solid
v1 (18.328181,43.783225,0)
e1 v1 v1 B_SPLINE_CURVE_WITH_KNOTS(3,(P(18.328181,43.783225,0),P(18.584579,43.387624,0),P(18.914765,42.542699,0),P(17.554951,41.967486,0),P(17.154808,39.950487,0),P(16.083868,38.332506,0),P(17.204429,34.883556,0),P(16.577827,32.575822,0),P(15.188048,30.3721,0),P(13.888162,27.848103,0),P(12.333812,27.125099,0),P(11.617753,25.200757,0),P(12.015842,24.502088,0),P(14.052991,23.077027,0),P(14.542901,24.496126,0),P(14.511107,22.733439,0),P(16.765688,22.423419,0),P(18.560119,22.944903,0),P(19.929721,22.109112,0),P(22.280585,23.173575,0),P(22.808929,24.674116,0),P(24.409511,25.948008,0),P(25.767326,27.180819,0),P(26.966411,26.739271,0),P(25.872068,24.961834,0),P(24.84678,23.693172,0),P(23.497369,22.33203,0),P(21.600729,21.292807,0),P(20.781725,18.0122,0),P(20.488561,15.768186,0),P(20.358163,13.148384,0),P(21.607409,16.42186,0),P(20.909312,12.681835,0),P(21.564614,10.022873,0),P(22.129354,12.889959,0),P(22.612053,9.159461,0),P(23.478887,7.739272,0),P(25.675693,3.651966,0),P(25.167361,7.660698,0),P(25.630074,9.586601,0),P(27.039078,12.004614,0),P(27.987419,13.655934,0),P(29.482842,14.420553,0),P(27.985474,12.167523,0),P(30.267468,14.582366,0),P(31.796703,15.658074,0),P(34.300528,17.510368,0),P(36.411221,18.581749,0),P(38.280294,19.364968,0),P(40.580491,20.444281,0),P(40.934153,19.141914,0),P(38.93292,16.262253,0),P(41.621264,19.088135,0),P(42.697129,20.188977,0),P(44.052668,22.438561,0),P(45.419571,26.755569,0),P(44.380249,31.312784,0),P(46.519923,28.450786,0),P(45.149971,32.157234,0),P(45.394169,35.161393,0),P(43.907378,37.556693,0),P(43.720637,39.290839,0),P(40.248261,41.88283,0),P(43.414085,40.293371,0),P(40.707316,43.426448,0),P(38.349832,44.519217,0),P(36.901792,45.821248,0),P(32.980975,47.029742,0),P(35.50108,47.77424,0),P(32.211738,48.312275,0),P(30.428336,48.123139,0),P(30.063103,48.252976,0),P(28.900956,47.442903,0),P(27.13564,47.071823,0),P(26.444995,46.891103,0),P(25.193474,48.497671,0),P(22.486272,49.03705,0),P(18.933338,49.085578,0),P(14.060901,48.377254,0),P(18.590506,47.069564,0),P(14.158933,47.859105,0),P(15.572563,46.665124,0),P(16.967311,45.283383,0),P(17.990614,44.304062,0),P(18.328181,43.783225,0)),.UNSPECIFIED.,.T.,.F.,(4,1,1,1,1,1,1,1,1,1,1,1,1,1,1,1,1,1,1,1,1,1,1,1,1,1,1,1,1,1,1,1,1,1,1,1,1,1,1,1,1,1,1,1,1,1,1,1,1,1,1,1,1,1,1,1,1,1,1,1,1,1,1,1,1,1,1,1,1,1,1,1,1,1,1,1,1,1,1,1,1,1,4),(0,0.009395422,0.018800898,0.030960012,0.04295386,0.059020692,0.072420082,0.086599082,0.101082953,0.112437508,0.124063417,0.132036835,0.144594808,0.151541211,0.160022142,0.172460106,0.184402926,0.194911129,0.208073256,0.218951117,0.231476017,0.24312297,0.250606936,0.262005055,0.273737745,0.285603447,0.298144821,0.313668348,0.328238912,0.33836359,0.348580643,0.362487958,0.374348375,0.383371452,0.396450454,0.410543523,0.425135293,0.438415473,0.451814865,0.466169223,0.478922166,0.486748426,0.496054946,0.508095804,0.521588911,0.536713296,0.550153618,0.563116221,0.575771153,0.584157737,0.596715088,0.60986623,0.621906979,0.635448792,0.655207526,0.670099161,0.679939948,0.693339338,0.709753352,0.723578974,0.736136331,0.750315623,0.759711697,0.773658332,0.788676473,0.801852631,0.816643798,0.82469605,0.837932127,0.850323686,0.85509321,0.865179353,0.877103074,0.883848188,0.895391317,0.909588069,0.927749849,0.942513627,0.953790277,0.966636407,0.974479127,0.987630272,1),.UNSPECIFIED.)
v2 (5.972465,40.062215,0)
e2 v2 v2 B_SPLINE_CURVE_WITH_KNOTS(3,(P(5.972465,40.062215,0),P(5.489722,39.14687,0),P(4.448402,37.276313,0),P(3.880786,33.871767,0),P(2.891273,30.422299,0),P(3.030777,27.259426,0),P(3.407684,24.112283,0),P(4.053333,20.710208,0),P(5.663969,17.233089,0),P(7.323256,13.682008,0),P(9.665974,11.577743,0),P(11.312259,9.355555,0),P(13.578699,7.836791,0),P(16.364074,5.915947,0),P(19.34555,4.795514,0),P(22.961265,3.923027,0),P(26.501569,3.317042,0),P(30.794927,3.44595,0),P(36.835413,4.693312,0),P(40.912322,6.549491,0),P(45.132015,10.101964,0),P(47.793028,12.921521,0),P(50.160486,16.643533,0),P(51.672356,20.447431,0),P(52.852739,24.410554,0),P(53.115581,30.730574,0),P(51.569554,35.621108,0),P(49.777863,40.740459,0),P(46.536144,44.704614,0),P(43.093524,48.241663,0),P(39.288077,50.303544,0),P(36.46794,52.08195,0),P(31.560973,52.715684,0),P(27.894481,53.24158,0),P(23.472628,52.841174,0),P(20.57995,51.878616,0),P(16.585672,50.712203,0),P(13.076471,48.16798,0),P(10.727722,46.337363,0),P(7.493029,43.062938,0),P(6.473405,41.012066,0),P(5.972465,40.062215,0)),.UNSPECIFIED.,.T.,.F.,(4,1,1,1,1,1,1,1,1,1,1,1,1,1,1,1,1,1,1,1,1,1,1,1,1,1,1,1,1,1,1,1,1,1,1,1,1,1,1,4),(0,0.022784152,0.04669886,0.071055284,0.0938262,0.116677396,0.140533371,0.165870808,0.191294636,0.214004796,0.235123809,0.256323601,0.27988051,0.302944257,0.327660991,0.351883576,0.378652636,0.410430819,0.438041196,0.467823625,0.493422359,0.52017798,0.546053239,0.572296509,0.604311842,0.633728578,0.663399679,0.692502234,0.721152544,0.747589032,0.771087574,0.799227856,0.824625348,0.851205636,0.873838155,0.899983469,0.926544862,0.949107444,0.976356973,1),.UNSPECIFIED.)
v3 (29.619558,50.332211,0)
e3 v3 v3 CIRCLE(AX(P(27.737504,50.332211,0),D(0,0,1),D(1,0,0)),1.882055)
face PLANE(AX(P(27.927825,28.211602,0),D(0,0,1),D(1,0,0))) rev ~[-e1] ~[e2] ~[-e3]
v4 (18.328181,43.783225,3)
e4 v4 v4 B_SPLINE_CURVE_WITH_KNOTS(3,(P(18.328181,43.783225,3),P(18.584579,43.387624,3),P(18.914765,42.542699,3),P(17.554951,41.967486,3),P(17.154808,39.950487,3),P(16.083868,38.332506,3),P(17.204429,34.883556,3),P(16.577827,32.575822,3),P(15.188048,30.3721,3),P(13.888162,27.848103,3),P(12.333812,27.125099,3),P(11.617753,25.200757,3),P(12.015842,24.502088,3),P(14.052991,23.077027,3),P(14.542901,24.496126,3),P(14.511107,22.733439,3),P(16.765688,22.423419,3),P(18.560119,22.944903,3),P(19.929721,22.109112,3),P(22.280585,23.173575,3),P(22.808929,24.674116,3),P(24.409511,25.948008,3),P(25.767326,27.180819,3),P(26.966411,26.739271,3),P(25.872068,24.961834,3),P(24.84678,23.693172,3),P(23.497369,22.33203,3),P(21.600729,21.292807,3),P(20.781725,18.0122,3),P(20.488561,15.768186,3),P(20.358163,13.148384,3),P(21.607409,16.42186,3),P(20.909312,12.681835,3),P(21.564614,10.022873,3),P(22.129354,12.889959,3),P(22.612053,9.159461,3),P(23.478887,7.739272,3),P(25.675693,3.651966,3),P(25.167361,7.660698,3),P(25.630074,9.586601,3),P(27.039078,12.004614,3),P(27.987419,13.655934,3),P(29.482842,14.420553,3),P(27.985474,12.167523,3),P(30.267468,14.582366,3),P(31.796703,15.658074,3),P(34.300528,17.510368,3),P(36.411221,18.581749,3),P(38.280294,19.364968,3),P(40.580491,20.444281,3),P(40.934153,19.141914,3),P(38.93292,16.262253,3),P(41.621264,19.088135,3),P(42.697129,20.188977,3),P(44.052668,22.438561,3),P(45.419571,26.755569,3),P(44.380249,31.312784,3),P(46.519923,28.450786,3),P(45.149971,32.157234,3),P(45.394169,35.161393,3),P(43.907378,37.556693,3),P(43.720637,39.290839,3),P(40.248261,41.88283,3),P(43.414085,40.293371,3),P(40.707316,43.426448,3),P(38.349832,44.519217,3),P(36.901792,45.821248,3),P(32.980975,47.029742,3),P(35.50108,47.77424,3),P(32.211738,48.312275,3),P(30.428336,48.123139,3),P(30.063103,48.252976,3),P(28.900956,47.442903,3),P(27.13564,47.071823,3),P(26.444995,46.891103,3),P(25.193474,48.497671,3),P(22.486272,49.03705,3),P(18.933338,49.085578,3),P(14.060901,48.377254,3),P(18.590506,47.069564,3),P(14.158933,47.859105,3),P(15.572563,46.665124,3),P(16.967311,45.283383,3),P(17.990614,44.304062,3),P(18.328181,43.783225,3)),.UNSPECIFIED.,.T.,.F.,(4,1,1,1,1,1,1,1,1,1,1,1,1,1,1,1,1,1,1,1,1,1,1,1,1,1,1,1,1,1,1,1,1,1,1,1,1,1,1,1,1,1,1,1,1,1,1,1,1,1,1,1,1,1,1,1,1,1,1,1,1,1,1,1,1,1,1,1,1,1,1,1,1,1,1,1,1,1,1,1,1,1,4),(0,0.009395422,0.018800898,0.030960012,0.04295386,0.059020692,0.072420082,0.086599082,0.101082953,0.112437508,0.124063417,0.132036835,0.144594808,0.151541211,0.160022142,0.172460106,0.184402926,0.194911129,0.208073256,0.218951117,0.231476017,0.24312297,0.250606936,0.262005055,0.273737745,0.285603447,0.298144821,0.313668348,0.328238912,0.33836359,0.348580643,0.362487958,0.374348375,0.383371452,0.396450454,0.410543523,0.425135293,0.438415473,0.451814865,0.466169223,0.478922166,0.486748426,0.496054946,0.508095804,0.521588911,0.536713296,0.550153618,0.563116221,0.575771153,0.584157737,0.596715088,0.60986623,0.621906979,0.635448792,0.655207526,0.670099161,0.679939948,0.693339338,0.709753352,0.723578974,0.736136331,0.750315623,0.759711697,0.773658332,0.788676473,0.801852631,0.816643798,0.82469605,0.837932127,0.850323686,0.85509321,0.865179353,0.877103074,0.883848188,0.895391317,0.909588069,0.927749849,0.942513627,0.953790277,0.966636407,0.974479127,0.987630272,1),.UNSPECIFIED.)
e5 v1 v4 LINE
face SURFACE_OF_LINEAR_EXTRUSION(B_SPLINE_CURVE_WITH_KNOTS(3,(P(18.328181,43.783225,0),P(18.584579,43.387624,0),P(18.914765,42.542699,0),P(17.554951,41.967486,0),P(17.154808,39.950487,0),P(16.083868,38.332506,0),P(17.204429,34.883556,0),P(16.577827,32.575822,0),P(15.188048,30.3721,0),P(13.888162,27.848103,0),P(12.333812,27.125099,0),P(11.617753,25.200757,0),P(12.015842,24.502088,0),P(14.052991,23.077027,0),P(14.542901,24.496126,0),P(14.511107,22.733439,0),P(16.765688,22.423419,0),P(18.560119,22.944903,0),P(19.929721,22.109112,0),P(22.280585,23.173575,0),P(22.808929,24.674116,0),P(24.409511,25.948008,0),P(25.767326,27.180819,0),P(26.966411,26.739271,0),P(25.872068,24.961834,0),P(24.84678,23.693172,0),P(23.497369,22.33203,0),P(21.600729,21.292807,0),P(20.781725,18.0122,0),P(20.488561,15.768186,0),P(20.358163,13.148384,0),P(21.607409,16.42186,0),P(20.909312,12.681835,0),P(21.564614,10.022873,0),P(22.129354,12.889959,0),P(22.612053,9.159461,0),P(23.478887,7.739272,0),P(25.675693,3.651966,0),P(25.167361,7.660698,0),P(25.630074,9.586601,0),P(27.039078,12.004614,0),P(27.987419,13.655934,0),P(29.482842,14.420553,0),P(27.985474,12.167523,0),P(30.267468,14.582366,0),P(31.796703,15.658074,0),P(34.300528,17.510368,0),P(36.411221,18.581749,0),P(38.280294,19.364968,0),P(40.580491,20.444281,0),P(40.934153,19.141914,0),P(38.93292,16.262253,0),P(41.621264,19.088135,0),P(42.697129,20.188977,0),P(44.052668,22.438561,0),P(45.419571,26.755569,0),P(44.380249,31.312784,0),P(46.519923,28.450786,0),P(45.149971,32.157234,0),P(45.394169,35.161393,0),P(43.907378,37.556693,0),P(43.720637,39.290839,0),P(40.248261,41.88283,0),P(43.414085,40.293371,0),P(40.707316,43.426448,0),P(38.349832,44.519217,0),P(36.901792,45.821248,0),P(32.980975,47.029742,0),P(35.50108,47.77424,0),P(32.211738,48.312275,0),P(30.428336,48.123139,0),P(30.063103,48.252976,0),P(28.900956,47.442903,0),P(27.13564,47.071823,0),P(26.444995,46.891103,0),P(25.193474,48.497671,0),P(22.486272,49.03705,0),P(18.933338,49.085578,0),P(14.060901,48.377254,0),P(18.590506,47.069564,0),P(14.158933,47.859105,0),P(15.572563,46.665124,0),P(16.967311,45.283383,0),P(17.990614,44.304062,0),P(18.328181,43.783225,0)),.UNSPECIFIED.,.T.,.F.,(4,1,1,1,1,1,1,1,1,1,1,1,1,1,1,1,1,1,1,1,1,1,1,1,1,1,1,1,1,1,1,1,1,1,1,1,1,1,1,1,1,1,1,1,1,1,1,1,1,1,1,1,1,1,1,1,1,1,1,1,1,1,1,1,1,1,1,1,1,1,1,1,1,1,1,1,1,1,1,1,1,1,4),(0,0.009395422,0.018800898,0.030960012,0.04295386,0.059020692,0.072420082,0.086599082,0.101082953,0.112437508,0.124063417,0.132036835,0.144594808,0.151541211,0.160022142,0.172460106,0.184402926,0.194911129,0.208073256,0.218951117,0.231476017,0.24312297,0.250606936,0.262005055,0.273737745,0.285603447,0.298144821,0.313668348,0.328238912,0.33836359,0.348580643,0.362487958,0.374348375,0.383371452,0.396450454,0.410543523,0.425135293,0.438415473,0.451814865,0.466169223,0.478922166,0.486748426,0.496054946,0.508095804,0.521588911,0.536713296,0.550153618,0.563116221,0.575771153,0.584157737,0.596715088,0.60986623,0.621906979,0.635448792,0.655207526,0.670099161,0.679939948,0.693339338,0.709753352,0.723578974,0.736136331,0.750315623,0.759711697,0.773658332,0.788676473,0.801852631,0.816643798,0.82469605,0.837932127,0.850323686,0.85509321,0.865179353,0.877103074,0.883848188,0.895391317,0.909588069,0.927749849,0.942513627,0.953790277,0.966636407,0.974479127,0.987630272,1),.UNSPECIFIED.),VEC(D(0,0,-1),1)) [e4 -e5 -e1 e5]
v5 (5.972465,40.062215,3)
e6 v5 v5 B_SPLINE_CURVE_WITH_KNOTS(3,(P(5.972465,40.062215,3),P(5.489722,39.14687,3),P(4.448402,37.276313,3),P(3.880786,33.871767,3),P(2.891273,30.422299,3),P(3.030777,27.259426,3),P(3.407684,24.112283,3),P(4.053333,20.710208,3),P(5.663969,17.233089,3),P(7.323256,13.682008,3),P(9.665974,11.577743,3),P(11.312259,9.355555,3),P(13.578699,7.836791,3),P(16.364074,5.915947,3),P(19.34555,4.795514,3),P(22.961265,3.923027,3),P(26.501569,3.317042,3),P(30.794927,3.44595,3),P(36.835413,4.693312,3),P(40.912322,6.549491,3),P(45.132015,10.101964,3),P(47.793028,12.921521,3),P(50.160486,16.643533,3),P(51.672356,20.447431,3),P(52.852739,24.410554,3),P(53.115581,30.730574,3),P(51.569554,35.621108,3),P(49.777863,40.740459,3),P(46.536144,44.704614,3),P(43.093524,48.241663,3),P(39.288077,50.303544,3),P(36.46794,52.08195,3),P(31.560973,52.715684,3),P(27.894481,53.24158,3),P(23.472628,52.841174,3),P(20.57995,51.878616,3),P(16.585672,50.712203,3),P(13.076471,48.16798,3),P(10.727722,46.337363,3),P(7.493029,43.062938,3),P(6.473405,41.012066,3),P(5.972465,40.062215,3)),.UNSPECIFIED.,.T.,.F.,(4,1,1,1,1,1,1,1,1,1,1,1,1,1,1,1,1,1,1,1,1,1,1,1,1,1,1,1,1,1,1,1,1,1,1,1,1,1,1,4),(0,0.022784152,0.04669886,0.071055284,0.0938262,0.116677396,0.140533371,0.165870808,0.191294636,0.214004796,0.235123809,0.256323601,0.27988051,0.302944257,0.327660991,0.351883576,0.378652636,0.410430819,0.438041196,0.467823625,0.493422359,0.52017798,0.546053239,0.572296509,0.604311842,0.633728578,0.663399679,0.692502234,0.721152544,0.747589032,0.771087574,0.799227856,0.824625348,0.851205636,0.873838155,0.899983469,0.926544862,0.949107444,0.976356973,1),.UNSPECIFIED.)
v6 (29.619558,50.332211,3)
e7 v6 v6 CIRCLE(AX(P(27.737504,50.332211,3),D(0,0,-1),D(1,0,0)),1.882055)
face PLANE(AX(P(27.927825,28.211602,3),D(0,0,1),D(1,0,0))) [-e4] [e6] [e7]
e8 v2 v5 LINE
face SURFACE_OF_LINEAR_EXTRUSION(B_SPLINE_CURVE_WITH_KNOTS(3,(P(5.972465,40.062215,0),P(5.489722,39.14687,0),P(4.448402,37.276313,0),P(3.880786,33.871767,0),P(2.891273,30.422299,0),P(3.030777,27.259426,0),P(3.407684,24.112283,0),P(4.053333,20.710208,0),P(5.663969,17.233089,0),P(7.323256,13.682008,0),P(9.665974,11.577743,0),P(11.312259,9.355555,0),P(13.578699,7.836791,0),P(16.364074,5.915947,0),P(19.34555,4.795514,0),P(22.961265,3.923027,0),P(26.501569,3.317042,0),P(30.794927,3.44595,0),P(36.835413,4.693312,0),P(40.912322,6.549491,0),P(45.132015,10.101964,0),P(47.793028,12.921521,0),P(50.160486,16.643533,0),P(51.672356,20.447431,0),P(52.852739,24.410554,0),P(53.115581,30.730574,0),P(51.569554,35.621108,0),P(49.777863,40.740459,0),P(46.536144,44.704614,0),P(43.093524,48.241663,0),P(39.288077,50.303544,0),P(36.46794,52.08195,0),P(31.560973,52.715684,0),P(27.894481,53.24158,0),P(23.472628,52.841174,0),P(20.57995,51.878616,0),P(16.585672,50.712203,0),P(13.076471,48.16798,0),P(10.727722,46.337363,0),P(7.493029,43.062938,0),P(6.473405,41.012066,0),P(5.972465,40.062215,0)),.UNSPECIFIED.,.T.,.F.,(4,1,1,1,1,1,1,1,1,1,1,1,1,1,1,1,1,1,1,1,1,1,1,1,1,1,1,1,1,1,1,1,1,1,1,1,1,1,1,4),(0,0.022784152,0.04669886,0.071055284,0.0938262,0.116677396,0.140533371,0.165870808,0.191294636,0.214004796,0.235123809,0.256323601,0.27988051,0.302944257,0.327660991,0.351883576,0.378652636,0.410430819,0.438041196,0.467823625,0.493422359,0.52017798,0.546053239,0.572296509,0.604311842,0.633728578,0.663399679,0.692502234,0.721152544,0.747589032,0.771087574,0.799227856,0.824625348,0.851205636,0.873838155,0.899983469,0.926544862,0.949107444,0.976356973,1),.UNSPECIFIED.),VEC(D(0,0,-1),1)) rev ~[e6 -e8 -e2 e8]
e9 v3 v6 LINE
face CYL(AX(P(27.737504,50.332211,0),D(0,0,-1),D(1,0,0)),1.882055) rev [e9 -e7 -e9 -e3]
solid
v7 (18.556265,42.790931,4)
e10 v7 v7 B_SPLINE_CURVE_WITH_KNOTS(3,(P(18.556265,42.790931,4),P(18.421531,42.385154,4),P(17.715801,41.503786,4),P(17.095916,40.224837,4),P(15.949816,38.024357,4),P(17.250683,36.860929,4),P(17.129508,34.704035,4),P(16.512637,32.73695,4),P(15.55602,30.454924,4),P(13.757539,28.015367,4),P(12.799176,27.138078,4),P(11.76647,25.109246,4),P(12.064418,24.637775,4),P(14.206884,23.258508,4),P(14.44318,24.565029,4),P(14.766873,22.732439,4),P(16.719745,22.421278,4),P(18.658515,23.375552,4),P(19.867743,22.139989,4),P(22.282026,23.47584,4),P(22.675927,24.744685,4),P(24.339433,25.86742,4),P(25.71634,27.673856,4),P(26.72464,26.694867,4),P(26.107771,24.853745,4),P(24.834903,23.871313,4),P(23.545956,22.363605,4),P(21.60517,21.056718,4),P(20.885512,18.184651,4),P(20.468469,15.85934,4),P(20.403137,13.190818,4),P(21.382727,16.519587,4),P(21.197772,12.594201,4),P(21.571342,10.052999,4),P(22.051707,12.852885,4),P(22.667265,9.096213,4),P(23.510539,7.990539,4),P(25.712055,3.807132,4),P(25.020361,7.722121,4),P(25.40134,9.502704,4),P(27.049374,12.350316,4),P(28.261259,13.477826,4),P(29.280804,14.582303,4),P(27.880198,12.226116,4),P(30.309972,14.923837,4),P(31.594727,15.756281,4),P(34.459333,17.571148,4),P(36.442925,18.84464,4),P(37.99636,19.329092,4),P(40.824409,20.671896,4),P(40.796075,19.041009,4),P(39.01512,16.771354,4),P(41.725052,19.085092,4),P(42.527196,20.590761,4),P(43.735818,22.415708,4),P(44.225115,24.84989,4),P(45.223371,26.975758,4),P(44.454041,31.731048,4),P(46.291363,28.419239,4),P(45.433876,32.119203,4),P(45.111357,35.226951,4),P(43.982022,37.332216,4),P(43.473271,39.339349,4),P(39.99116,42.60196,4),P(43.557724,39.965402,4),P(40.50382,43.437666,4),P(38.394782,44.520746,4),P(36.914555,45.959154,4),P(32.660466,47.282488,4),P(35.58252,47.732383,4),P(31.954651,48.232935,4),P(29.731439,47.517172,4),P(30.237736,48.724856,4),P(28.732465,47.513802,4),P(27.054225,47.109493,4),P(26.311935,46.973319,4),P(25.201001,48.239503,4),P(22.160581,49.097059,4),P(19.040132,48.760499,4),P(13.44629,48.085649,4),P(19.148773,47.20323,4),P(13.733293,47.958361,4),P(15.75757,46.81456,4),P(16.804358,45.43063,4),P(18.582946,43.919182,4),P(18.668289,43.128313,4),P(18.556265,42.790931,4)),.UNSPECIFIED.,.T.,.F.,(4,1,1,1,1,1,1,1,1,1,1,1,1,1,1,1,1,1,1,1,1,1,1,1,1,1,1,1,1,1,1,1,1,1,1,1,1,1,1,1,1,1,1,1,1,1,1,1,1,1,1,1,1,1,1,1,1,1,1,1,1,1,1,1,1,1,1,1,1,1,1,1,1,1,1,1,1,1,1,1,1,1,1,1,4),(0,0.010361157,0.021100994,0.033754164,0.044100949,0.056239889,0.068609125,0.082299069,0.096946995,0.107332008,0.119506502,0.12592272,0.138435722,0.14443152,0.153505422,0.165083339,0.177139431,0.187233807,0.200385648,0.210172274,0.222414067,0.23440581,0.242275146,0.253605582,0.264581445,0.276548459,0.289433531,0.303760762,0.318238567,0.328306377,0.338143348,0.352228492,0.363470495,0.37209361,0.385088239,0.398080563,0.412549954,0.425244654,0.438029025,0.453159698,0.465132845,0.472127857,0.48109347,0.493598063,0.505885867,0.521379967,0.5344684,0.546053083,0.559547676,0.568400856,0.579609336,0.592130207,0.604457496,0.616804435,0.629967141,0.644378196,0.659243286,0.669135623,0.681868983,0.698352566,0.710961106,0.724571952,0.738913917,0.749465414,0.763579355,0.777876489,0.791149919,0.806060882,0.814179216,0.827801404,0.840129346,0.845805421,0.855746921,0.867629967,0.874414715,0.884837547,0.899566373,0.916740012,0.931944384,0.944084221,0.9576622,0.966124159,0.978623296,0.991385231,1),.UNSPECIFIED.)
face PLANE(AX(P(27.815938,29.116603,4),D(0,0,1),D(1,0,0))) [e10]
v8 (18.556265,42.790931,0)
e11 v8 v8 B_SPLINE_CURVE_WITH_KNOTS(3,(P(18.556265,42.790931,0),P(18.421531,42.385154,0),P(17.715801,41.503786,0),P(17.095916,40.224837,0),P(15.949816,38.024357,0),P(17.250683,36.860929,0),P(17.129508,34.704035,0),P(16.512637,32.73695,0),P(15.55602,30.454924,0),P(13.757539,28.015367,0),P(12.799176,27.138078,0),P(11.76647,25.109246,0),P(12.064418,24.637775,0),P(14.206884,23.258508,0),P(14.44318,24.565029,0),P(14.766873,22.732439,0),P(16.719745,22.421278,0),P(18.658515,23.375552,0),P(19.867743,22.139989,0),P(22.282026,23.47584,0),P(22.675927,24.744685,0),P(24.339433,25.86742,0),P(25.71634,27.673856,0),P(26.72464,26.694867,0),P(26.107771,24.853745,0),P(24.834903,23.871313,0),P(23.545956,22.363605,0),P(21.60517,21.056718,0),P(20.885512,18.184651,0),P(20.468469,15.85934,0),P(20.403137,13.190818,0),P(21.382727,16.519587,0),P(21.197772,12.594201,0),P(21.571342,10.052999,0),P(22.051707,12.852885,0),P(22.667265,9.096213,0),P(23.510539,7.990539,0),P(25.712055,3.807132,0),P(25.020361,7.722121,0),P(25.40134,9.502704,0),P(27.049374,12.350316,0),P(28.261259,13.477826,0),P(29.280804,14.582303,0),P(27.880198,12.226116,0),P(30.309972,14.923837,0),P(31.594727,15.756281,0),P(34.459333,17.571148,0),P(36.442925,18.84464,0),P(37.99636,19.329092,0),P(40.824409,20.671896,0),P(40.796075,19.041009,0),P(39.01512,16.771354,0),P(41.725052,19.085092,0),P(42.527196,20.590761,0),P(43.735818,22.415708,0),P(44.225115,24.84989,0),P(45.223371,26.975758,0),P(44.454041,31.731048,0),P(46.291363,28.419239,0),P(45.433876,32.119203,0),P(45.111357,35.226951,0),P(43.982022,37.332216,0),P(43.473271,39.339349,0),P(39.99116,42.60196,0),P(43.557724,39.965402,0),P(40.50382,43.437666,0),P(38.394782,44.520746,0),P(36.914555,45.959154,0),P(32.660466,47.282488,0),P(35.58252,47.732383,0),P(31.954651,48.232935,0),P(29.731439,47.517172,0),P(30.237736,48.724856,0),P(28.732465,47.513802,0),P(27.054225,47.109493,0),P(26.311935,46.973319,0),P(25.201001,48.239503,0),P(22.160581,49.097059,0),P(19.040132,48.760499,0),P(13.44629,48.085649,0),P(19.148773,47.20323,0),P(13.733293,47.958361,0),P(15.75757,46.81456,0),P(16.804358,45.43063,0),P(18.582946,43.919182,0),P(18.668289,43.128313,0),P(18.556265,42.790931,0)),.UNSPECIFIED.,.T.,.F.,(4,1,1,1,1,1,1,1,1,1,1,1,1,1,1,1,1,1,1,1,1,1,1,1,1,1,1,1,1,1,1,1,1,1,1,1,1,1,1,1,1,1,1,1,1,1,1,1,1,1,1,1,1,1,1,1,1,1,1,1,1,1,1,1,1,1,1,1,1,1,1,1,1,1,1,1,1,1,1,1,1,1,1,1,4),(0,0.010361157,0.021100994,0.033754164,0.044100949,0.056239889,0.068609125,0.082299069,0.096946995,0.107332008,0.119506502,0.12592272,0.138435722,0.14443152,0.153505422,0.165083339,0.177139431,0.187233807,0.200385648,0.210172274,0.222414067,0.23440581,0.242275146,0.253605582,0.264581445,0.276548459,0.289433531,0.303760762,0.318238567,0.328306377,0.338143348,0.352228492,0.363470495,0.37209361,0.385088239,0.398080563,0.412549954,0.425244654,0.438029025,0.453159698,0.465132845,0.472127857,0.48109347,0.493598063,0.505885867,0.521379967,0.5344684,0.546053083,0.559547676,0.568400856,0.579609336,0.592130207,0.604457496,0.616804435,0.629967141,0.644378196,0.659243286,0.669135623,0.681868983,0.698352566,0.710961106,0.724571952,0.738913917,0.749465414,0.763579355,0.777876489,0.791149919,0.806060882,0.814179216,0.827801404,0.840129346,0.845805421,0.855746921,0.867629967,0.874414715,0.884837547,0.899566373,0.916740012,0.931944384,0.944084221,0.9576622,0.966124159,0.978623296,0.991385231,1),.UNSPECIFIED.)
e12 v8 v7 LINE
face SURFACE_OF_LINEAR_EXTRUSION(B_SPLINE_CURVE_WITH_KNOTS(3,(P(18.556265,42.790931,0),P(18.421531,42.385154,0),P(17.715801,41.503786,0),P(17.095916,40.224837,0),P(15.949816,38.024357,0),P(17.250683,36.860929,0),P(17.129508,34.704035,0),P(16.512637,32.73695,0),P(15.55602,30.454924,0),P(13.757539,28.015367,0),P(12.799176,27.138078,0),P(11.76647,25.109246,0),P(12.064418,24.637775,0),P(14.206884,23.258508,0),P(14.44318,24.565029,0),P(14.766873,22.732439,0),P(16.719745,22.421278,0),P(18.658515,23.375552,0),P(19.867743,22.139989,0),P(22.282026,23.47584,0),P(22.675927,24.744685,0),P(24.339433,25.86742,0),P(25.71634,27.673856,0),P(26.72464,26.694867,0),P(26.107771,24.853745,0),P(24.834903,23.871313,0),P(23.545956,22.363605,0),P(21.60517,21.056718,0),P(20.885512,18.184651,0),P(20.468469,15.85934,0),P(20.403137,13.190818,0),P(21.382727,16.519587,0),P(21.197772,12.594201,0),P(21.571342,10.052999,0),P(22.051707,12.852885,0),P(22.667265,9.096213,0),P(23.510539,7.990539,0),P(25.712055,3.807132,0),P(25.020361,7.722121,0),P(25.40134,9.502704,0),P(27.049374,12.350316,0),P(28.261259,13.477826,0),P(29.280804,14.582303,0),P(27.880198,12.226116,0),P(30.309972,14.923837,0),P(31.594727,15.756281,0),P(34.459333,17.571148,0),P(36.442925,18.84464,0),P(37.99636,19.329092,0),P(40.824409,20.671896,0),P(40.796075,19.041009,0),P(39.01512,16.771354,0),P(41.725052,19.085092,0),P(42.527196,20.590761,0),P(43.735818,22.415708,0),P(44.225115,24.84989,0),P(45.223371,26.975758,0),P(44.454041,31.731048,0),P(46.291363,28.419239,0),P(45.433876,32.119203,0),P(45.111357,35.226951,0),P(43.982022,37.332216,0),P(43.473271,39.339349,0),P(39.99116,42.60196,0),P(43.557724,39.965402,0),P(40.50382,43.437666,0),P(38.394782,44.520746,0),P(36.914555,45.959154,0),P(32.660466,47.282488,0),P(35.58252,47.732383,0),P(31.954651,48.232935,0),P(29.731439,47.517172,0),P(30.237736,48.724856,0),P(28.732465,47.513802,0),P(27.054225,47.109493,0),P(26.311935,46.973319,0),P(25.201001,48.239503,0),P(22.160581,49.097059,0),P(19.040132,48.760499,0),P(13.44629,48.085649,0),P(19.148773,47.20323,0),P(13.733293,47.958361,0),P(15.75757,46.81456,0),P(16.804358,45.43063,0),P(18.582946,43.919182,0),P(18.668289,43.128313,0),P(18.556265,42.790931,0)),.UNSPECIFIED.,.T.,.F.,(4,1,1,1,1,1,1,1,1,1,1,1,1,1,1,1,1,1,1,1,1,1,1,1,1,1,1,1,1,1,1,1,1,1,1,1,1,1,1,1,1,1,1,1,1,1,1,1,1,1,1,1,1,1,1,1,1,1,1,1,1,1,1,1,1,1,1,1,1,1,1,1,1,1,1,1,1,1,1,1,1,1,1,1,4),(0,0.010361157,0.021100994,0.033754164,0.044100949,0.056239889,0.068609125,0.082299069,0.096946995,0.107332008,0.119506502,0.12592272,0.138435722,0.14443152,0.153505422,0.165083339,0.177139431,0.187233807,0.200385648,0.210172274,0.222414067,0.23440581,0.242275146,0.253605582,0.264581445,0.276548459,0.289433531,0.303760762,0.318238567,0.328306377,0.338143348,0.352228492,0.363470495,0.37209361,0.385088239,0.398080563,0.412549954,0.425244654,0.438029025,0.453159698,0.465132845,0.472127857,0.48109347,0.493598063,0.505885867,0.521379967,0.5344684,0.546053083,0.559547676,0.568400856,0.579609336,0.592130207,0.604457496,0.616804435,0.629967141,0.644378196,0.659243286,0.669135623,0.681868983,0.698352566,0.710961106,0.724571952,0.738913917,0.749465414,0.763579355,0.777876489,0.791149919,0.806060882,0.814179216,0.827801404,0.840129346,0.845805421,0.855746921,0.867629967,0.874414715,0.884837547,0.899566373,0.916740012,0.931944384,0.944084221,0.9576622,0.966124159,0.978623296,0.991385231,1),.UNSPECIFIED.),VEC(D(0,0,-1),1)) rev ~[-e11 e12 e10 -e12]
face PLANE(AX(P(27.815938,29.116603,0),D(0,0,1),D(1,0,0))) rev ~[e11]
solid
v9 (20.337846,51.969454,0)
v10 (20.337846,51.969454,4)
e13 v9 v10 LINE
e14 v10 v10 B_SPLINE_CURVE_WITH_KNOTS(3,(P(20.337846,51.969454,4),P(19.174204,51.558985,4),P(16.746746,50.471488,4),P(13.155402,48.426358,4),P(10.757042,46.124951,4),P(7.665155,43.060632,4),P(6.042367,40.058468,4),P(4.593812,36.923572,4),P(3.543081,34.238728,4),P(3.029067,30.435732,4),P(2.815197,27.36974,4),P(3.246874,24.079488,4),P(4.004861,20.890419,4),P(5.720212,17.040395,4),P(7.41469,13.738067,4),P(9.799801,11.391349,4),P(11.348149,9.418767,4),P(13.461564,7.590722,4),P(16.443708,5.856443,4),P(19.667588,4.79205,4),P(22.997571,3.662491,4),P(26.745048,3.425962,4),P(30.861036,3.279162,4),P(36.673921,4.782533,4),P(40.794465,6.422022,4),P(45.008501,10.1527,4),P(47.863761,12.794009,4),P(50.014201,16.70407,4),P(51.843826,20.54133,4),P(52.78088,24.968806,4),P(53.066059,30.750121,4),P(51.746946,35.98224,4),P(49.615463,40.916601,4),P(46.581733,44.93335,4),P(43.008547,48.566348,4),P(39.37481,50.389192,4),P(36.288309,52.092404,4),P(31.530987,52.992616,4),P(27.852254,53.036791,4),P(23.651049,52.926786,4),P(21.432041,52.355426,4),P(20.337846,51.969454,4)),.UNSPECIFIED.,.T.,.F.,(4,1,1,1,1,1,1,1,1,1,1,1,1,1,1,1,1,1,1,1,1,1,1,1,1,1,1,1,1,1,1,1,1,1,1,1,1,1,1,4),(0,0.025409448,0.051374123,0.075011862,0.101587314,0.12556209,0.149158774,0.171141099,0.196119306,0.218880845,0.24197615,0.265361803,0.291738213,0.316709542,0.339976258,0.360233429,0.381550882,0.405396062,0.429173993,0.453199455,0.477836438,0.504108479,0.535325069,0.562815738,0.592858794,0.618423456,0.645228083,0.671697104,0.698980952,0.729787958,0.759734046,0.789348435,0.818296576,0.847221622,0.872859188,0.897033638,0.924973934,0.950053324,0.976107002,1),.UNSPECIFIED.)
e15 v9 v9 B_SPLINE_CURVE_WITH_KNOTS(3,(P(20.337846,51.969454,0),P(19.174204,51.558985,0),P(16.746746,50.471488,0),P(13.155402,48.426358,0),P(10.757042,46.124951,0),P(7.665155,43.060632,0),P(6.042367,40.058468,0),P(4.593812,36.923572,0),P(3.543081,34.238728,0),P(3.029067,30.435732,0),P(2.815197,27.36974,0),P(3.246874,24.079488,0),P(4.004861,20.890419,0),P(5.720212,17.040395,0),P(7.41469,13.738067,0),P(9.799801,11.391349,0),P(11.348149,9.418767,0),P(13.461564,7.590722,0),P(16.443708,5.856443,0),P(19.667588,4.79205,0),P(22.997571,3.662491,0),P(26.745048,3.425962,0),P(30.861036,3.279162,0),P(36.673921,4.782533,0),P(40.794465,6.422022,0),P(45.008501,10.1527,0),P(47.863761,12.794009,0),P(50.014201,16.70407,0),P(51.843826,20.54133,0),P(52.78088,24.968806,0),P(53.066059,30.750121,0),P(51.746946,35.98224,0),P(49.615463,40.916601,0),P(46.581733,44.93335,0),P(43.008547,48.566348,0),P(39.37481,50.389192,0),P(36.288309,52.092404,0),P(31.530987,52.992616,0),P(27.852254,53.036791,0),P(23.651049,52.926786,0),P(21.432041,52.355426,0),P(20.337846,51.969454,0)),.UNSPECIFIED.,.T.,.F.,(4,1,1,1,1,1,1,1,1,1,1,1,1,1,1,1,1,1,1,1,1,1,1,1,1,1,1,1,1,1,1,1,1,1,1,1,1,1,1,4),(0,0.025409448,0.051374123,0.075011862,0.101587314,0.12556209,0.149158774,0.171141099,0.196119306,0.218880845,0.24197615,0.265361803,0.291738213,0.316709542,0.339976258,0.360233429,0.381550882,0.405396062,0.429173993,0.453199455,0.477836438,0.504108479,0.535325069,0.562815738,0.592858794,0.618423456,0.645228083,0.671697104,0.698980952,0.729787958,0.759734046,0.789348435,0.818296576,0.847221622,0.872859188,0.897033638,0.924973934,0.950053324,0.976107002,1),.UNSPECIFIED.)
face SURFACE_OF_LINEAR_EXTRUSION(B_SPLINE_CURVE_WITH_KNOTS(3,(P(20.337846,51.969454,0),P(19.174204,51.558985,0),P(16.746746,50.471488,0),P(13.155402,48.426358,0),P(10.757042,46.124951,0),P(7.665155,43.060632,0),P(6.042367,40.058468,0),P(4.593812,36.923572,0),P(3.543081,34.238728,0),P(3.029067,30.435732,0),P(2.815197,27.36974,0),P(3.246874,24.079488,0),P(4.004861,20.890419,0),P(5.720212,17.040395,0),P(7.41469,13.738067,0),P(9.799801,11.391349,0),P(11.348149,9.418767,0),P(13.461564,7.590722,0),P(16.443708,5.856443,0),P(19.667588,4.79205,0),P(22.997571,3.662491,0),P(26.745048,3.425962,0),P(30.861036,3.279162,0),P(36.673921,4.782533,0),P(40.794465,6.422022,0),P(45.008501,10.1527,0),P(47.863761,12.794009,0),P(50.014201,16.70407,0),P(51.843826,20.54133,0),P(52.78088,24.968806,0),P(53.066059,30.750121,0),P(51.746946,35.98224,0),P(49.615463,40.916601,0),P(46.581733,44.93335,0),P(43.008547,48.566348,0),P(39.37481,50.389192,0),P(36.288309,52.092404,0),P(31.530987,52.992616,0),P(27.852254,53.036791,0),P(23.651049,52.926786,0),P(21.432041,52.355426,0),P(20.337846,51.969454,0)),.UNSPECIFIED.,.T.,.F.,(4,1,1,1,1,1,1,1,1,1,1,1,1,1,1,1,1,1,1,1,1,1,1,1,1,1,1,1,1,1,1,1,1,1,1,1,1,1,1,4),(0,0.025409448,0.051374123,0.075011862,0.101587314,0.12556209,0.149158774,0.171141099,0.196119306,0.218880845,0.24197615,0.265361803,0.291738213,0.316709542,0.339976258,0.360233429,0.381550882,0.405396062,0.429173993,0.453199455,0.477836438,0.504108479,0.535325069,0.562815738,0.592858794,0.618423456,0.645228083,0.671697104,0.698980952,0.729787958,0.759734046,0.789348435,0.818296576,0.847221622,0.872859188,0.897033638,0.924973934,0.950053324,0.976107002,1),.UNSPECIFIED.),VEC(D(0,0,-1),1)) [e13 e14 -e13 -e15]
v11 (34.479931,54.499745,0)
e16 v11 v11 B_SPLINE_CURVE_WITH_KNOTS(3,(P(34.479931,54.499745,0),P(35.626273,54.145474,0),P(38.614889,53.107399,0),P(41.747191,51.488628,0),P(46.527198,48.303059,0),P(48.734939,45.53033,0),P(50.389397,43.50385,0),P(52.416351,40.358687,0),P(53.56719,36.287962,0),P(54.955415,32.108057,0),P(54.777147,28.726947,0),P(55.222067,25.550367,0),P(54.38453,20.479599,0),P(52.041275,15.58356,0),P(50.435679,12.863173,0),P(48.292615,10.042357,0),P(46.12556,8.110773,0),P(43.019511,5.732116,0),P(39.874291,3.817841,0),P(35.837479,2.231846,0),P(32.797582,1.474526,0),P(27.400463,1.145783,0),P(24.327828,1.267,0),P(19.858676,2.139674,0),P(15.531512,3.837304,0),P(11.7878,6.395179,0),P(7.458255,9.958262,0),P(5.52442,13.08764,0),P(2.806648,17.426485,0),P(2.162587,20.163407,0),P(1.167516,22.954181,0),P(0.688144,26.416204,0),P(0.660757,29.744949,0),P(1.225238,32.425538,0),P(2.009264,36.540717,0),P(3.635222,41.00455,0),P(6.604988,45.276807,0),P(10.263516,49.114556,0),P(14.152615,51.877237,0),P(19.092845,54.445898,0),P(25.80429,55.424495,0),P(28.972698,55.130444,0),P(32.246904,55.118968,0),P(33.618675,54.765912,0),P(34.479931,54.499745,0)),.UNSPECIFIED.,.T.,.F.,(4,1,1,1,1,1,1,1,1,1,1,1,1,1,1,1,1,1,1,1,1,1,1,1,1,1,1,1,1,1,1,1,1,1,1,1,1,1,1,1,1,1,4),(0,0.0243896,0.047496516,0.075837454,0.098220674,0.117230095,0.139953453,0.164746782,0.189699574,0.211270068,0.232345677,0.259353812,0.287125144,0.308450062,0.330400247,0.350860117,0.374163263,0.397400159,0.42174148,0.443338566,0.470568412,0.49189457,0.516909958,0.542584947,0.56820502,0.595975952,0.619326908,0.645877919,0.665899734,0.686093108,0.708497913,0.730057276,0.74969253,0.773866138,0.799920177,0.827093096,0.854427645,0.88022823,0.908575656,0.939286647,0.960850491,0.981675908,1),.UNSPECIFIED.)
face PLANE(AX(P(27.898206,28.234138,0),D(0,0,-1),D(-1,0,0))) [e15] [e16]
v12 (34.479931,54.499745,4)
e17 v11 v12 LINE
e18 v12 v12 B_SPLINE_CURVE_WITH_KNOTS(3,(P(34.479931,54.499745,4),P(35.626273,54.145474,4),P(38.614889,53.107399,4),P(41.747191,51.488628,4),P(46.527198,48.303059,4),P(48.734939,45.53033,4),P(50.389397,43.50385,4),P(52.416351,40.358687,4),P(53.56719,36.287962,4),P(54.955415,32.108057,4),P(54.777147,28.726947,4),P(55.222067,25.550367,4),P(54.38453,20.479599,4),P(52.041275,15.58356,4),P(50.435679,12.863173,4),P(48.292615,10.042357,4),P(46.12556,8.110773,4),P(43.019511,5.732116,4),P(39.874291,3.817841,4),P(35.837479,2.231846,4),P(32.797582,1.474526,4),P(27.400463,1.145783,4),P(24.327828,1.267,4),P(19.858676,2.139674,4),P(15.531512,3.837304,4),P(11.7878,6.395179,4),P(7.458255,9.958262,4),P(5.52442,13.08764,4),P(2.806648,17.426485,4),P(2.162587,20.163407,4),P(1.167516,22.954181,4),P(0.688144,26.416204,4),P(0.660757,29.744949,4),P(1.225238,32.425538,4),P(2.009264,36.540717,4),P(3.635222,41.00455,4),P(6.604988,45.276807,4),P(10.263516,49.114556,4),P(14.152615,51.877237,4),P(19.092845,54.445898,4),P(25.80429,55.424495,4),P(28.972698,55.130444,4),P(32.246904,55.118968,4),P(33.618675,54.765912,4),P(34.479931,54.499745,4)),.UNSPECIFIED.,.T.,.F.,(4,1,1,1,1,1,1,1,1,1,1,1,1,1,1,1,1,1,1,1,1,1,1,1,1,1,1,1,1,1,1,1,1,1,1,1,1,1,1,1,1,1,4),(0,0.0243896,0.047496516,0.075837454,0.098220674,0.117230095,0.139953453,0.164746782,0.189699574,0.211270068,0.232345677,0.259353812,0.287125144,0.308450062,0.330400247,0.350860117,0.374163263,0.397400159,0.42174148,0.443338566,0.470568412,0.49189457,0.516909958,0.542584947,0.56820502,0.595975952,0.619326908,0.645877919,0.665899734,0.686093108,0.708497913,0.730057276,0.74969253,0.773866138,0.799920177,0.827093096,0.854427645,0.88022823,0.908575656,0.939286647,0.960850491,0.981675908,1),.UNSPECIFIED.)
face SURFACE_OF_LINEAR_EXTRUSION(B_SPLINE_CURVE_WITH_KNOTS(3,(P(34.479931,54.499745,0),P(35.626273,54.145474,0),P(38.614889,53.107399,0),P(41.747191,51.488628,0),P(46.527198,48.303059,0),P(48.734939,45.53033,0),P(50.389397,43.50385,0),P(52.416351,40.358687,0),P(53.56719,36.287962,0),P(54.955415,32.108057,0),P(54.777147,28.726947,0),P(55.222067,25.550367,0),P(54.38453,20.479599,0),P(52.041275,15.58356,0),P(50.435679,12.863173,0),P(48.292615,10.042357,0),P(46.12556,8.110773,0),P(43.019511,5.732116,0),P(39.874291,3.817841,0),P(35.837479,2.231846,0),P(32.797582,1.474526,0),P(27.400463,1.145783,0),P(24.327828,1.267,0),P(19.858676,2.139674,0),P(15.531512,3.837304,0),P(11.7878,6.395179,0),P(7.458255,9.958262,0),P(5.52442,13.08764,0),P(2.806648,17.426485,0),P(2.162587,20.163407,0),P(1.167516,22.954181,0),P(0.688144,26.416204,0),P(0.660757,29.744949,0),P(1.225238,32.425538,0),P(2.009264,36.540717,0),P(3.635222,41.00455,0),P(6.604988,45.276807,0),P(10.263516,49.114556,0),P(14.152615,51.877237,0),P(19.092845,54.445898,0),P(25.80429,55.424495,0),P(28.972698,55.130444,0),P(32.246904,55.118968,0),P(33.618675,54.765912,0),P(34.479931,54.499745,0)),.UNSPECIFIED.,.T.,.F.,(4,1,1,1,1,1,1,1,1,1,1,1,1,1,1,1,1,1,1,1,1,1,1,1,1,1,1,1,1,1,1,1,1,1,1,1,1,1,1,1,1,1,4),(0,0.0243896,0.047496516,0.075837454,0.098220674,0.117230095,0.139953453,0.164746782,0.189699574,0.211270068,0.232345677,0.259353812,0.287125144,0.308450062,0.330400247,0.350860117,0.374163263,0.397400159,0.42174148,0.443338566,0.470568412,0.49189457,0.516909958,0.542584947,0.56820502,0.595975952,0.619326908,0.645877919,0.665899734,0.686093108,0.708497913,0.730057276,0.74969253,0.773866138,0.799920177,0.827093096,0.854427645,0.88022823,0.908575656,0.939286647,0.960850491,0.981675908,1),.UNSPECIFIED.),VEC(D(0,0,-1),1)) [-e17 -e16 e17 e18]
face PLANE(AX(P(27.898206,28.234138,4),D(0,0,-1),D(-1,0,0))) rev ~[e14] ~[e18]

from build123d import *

# Parameters (mm, degrees)
F4_DEPTH  = 4
F5_DEPTH  = 4
F2_R      = 1.8820545133
F6_DEPTH  = 3
F8_R      = 1.5846941297
F9_DEPTH  = 4
F10_DEPTH = 4


# Not quite as in the source:
# - the program builds the solid bodies; features that only make, move or delete a surface that nothing else refers to are left out


with BuildPart() as f4:
    # F0 (on Top) → F4 (new body)
    with BuildSketch(Plane.XY):
        with BuildLine():
            add(Edge.make_bspline(
                [(18.5562651604, 42.7909307182), (18.4215312664, 42.3851537945), (17.7158013258, 41.5037860124), (17.0959159307, 40.2248370679), (15.9498157243, 38.0243570023), (17.2506828561, 36.8609286786), (17.1295075869, 34.7040352941), (16.5126368457, 32.7369497504), (15.5560201527, 30.4549243196), (13.7575389714, 28.0153669618), (12.799175522, 27.1380779485), (11.7664702912, 25.1092464404), (12.0644178962, 24.6377745601), (14.2068836882, 23.2585077591), (14.4431797453, 24.5650291399), (14.7668726498, 22.7324394766), (16.7197447937, 22.4212784818), (18.6585147185, 23.3755519954), (19.8677432958, 22.1399886507), (22.2820258178, 23.475839523), (22.6759274542, 24.7446848849), (24.3394334554, 25.8674199186), (25.7163404014, 27.673856323), (26.7246403482, 26.6948668964), (26.1077707678, 24.853744914), (24.8349029838, 23.8713129942), (23.5459555247, 22.3636054211), (21.6051700554, 21.0567176114), (20.8855115902, 18.1846513508), (20.4684690456, 15.8593397967), (20.4031366598, 13.1908179059), (21.3827274427, 16.5195865408), (21.1977723963, 12.5942008838), (21.5713420529, 10.0529993754), (22.0517066208, 12.8528846205), (22.6672650745, 9.0962128738), (23.5105387934, 7.9905387358), (25.7120553776, 3.8071318202), (25.020360857, 7.7221211031), (25.4013400752, 9.5027043321), (27.049373534, 12.3503159023), (28.2612591698, 13.4778262696), (29.2808044669, 14.5823030172), (27.8801976017, 12.2261155071), (30.3099720155, 14.9238371622), (31.5947274367, 15.7562814954), (34.4593332527, 17.5711478867), (36.4429250734, 18.8446399817), (37.9963600524, 19.3290924441), (40.8244094992, 20.6718959329), (40.7960751542, 19.0410089382), (39.0151197311, 16.7713540352), (41.725052143, 19.0850921358), (42.5271955302, 20.5907614593), (43.7358175787, 22.4157083215), (44.2251149078, 24.8498897974), (45.2233714127, 26.9757582349), (44.4540408444, 31.7310478503), (46.2913625604, 28.4192392382), (45.4338755154, 32.1192026142), (45.1113570416, 35.226951008), (43.9820222123, 37.3322163895), (43.4732705667, 39.3393485937), (39.9911596004, 42.6019596569), (43.5577244369, 39.9654020424), (40.5038196091, 43.4376664958), (38.3947815651, 44.5207456109), (36.9145549877, 45.9591536843), (32.6604656637, 47.2824882771), (35.5825197314, 47.7323829467), (31.9546510246, 48.2329346842), (29.7314391091, 47.5171719167), (30.2377357158, 48.7248556611), (28.7324648277, 47.5138023996), (27.0542248202, 47.1094932445), (26.3119347157, 46.9733193591), (25.2010011638, 48.2395026019), (22.1605808772, 49.0970593612), (19.0401320473, 48.7604989113), (13.4462899188, 48.0856491671), (19.148773227, 47.2032299486), (13.7332927421, 47.9583609124), (15.7575699724, 46.8145599642), (16.8043575059, 45.4306303515), (18.5829455142, 43.919181945), (18.6682894636, 43.1283133601), (18.5562651604, 42.7909307182)],
                knots=[0, 0, 0, 0, 0.0103611569, 0.0211009944, 0.033754164, 0.044100949, 0.0562398894, 0.0686091251, 0.0822990694, 0.0969469949, 0.1073320082, 0.1195065024, 0.1259227197, 0.138435722, 0.1444315201, 0.1535054216, 0.1650833387, 0.1771394308, 0.1872338073, 0.2003856482, 0.2101722739, 0.2224140673, 0.2344058097, 0.2422751457, 0.2536055817, 0.264581445, 0.2765484592, 0.2894335308, 0.3037607621, 0.3182385672, 0.3283063767, 0.3381433484, 0.3522284916, 0.3634704949, 0.3720936096, 0.3850882395, 0.3980805625, 0.4125499541, 0.4252446536, 0.4380290253, 0.4531596976, 0.4651328446, 0.4721278574, 0.4810934696, 0.4935980633, 0.5058858669, 0.5213799674, 0.5344683998, 0.5460530826, 0.5595476758, 0.5684008558, 0.5796093357, 0.5921302069, 0.604457496, 0.6168044353, 0.6299671409, 0.6443781962, 0.6592432859, 0.6691356229, 0.6818689832, 0.698352566, 0.7109611061, 0.7245719517, 0.7389139172, 0.7494654142, 0.7635793549, 0.7778764894, 0.7911499194, 0.8060608822, 0.8141792164, 0.8278014036, 0.8401293462, 0.845805421, 0.8557469209, 0.8676299668, 0.8744147147, 0.8848375473, 0.899566373, 0.9167400121, 0.9319443843, 0.9440842213, 0.9576621998, 0.9661241595, 0.9786232958, 0.9913852309, 1, 1, 1, 1], degree=3))
        make_face()
    extrude(amount=F4_DEPTH)


with BuildPart() as f5:
    # F1 (on Top) → F5 (new body)
    with BuildSketch(Plane.XY):
        with BuildLine():
            add(Edge.make_bspline(
                [(34.4799309969, 54.499745369), (35.6262734965, 54.1454744681), (38.6148886488, 53.1073992428), (41.747190705, 51.4886281676), (46.5271984131, 48.30305899), (48.7349391227, 45.5303297651), (50.3893973092, 43.5038502258), (52.4163505586, 40.3586870772), (53.5671900995, 36.2879620461), (54.9554152261, 32.1080573627), (54.7771465189, 28.7269471157), (55.2220669883, 25.5503672167), (54.3845303113, 20.4795987753), (52.0412754304, 15.5835601348), (50.4356791278, 12.8631726149), (48.292614741, 10.0423571222), (46.125559851, 8.1107725162), (43.0195109957, 5.7321159144), (39.874291258, 3.8178411097), (35.8374786296, 2.2318456408), (32.7975817845, 1.4745262164), (27.4004629786, 1.1457827562), (24.3278279133, 1.2669997026), (19.8586756582, 2.1396739435), (15.5315115107, 3.8373040418), (11.7877995558, 6.3951788076), (7.4582549601, 9.9582616609), (5.5244195076, 13.0876398049), (2.8066476892, 17.4264849603), (2.1625871244, 20.1634074923), (1.1675164824, 22.9541806386), (0.6881440402, 26.4162035447), (0.6607573929, 29.744948627), (1.2252376004, 32.4255381807), (2.0092644714, 36.5407169863), (3.6352216726, 41.0045497356), (6.6049876085, 45.2768074675), (10.2635155584, 49.1145557987), (14.1526146099, 51.8772366999), (19.0928448574, 54.4458976525), (25.804290261, 55.424495133), (28.9726980587, 55.1304435607), (32.2469035908, 55.1189682952), (33.6186751723, 54.7659117869), (34.4799309969, 54.499745369)],
                knots=[0, 0, 0, 0, 0.0243896001, 0.0474965162, 0.0758374539, 0.098220674, 0.1172300945, 0.1399534535, 0.1647467823, 0.1896995745, 0.211270068, 0.2323456767, 0.2593538122, 0.287125144, 0.3084500624, 0.3304002471, 0.3508601167, 0.3741632631, 0.3974001588, 0.42174148, 0.4433385661, 0.4705684117, 0.49189457, 0.5169099576, 0.5425849472, 0.5682050196, 0.5959759518, 0.6193269077, 0.6458779194, 0.665899734, 0.6860931079, 0.708497913, 0.7300572758, 0.7496925296, 0.7738661376, 0.7999201769, 0.8270930958, 0.8544276454, 0.8802282297, 0.908575656, 0.9392866471, 0.9608504911, 0.9816759082, 1, 1, 1, 1], degree=3))
        make_face()
        with BuildLine():
            add(Edge.make_bspline(
                [(20.3378461301, 51.9694536924), (19.1742040201, 51.5589848153), (16.7467459788, 50.4714875874), (13.1554017472, 48.4263577047), (10.7570419663, 46.1249510076), (7.6651545497, 43.0606317144), (6.0423672568, 40.0584684616), (4.5938121829, 36.9235718565), (3.543081208, 34.2387282175), (3.0290665941, 30.4357317654), (2.8151974269, 27.3697396453), (3.2468744753, 24.0794883971), (4.0048614958, 20.890418552), (5.7202121433, 17.0403948912), (7.4146900027, 13.7380673731), (9.7998009044, 11.3913492298), (11.3481492859, 9.4187665131), (13.4615640025, 7.5907219479), (16.4437076174, 5.8564429156), (19.6675884735, 4.792050307), (22.9975710995, 3.662491064), (26.7450478189, 3.4259616783), (30.8610364154, 3.2791620404), (36.6739212336, 4.7825332589), (40.7944648743, 6.4220223412), (45.0085013952, 10.1526996405), (47.8637606999, 12.7940087998), (50.0142009203, 16.704069632), (51.8438259294, 20.5413302587), (52.7808801285, 24.968806016), (53.0660590919, 30.7501211565), (51.7469460875, 35.9822399744), (49.615463109, 40.9166012264), (46.5817329215, 44.9333503398), (43.0085466455, 48.5663484826), (39.3748099722, 50.3891920662), (36.2883093918, 52.0924038667), (31.5309870375, 52.9926164731), (27.8522542002, 53.0367908812), (23.6510488502, 52.9267863037), (21.4320414638, 52.35542557), (20.3378461301, 51.9694536924)],
                knots=[0, 0, 0, 0, 0.0254094476, 0.0513741225, 0.0750118623, 0.1015873137, 0.1255620904, 0.1491587738, 0.1711410989, 0.1961193061, 0.218880845, 0.2419761496, 0.2653618033, 0.2917382127, 0.3167095418, 0.3399762576, 0.360233429, 0.381550882, 0.4053960625, 0.4291739932, 0.4531994553, 0.4778364378, 0.5041084793, 0.5353250691, 0.5628157382, 0.5928587943, 0.6184234564, 0.6452280828, 0.6716971041, 0.6989809519, 0.7297879583, 0.7597340465, 0.7893484345, 0.8182965762, 0.8472216219, 0.872859188, 0.8970336379, 0.9249739338, 0.9500533241, 0.9761070016, 1, 1, 1, 1], degree=3))
        make_face(mode=Mode.SUBTRACT)
    extrude(amount=F5_DEPTH)


with BuildPart() as f6:
    # F2 (on Top) → F6 (new body)
    with BuildSketch(Plane.XY):
        with BuildLine():
            add(Edge.make_bspline(
                [(5.9724645689, 40.0622151792), (5.4897215696, 39.1468696857), (4.4484015533, 37.2763130428), (3.8807857684, 33.8717669388), (2.8912729692, 30.4222986677), (3.0307767014, 27.2594263771), (3.4076838641, 24.1122830977), (4.0533332189, 20.7102083123), (5.6639694444, 17.2330893379), (7.3232557243, 13.6820080946), (9.6659735238, 11.5777426668), (11.3122586295, 9.3555552377), (13.578698674, 7.8367909149), (16.3640742068, 5.9159468873), (19.3455503336, 4.7955139976), (22.9612653874, 3.9230273268), (26.5015685348, 3.3170417249), (30.7949273613, 3.445949784), (36.8354130711, 4.6933121479), (40.912322393, 6.5494910163), (45.13201504, 10.1019636396), (47.793028087, 12.9215213904), (50.1604864739, 16.6435325725), (51.672356085, 20.4474309989), (52.8527392465, 24.4105543519), (53.1155807505, 30.7305744808), (51.5695536165, 35.6211075635), (49.7778626051, 40.7404590874), (46.5361436314, 44.7046135017), (43.0935242681, 48.2416634833), (39.2880770509, 50.3035440307), (36.4679404793, 52.0819500268), (31.5609731444, 52.7156842289), (27.8944813107, 53.2415795448), (23.4726280744, 52.8411743616), (20.5799504892, 51.8786164501), (16.5856723516, 50.7122026783), (13.0764708733, 48.1679800435), (10.7277216617, 46.3373632178), (7.4930291441, 43.0629376964), (6.4734051255, 41.0120656827), (5.9724645689, 40.0622151792)],
                knots=[0, 0, 0, 0, 0.0227841519, 0.0466988604, 0.0710552837, 0.0938261999, 0.1166773955, 0.1405333706, 0.1658708078, 0.1912946359, 0.2140047963, 0.2351238092, 0.256323601, 0.2798805099, 0.3029442569, 0.3276609909, 0.3518835762, 0.378652636, 0.4104308195, 0.4380411961, 0.4678236254, 0.4934223592, 0.5201779803, 0.5460532392, 0.572296509, 0.6043118418, 0.6337285785, 0.663399679, 0.6925022336, 0.7211525435, 0.7475890325, 0.7710875738, 0.7992278558, 0.8246253481, 0.8512056356, 0.8738381548, 0.8999834687, 0.9265448624, 0.9491074439, 0.9763569731, 1, 1, 1, 1], degree=3))
        make_face()
        with BuildLine():
            add(Edge.make_bspline(
                [(18.3281805366, 43.7832251191), (18.5845792486, 43.3876240235), (18.9147650049, 42.5426992126), (17.5549506598, 41.9674861095), (17.1548079959, 39.9504866207), (16.0838680334, 38.3325056903), (17.2044287518, 34.8835562858), (16.577827187, 32.5758220884), (15.1880480547, 30.3720998613), (13.8881620773, 27.8481028608), (12.333811938, 27.1250990792), (11.6177533691, 25.2007566358), (12.0158415824, 24.5020876227), (14.0529914521, 23.0770267776), (14.5429005942, 24.4961259463), (14.5111070009, 22.7334389414), (16.7656878153, 22.4234192994), (18.5601193435, 22.9449028943), (19.9297205235, 22.1091115796), (22.2805847106, 23.1735749389), (22.8089292905, 24.6741162525), (24.4095107441, 25.9480075789), (25.7673257518, 27.180818804), (26.9664108312, 26.7392707514), (25.8720682158, 24.9618337027), (24.8467802674, 23.6931720718), (23.4973694081, 22.3320297593), (21.6007290808, 21.2928067974), (20.7817250048, 18.0121996509), (20.488560769, 15.7681861662), (20.3581626069, 13.1483841947), (21.6074094082, 16.4218601118), (20.9093120798, 12.68183479), (21.5646138791, 10.0228726674), (22.1293538479, 12.8899594107), (22.6120525378, 9.1594605987), (23.4788873863, 7.7392719947), (25.6756927003, 3.6519658298), (25.1673606709, 7.6606984491), (25.6300736419, 9.5866014116), (27.0390779523, 12.0046142428), (27.9874188083, 13.6559341848), (29.4828420399, 14.4205531591), (27.9854735017, 12.1675225943), (30.2674684172, 14.5823657552), (31.7967031896, 15.6580738819), (34.3005277954, 17.5103678355), (36.4112207707, 18.5817485395), (38.2802940029, 19.3649677637), (40.5804906515, 20.4442809159), (40.9341532955, 19.1419144626), (38.9329199277, 16.2622525767), (41.6212639193, 19.088134865), (42.6971291613, 20.1889771637), (44.0526680389, 22.4385611029), (45.4195710943, 26.7555687241), (44.3802491658, 31.3127836996), (46.5199228426, 28.4507857395), (45.1499707505, 32.1572341067), (45.3941689935, 35.1613933518), (43.9073777822, 37.5566928824), (43.7206369429, 39.2908392258), (40.2482614366, 41.8828299847), (43.4140846389, 40.2933714561), (40.7073160013, 43.426448313), (38.3498316556, 44.5192168903), (36.9017918339, 45.8212475022), (32.9809751403, 47.0297422988), (35.5010798945, 47.7742399172), (32.2117382341, 48.3122748091), (30.4283364967, 48.1231387492), (30.063102547, 48.2529764636), (28.9009555949, 47.4429034848), (27.1356395243, 47.0718230527), (26.4449945422, 46.8911032234), (25.1934736758, 48.497670752), (22.48627191, 49.0370498887), (18.9333376393, 49.0855783912), (14.0609008283, 48.3772535849), (18.5905063036, 47.0695641355), (14.1589333133, 47.8591047175), (15.5725630031, 46.6651241434), (16.9673108062, 45.2833828644), (17.9906137466, 44.3040615576), (18.3281805366, 43.7832251191)],
                knots=[0, 0, 0, 0, 0.0093954215, 0.018800898, 0.0309600125, 0.0429538602, 0.0590206917, 0.0724200819, 0.0865990816, 0.1010829532, 0.1124375078, 0.1240634169, 0.1320368354, 0.1445948075, 0.1515412109, 0.160022142, 0.1724601058, 0.1844029258, 0.1949111293, 0.2080732563, 0.2189511175, 0.231476017, 0.2431229695, 0.2506069362, 0.2620050545, 0.2737377446, 0.2856034466, 0.2981448213, 0.3136683476, 0.3282389115, 0.3383635896, 0.3485806432, 0.3624879576, 0.3743483749, 0.3833714522, 0.3964504543, 0.4105435228, 0.4251352933, 0.4384154727, 0.4518148652, 0.4661692234, 0.4789221664, 0.4867484258, 0.4960549462, 0.5080958043, 0.5215889107, 0.5367132958, 0.550153618, 0.5631162207, 0.5757711535, 0.5841577371, 0.5967150885, 0.6098662297, 0.621906979, 0.6354487923, 0.6552075258, 0.6700991609, 0.679939948, 0.6933393382, 0.7097533517, 0.7235789744, 0.7361363307, 0.7503156232, 0.7597116965, 0.773658332, 0.7886764727, 0.8018526312, 0.8166437983, 0.8246960497, 0.8379321266, 0.850323686, 0.8550932095, 0.8651793531, 0.8771030741, 0.8838481882, 0.8953913169, 0.909588069, 0.9277498495, 0.9425136268, 0.9537902768, 0.9666364068, 0.974479127, 0.9876302721, 1, 1, 1, 1], degree=3))
        make_face(mode=Mode.SUBTRACT)
        with Locations((27.7375038713, 50.332210958)):
            Circle(F2_R, mode=Mode.SUBTRACT)
    extrude(amount=F6_DEPTH)

    # F8 (on face) → F9 (join)
    with BuildSketch(Plane.XY.offset(3)):
        with Locations((26.687450707, 51.1875003576)):
            Circle(F8_R)
    extrude(amount=F9_DEPTH)

    # F10 (cut): a face of the model
    f10_faces = [f6.faces().sort_by_distance(p)[0] for p in [
        (26.687450707, 51.1875003576, 7),
    ]]
    extrude(f10_faces, amount=-F10_DEPTH, mode=Mode.SUBTRACT)


solid = Compound([f4.part, f5.part, f6.part])
